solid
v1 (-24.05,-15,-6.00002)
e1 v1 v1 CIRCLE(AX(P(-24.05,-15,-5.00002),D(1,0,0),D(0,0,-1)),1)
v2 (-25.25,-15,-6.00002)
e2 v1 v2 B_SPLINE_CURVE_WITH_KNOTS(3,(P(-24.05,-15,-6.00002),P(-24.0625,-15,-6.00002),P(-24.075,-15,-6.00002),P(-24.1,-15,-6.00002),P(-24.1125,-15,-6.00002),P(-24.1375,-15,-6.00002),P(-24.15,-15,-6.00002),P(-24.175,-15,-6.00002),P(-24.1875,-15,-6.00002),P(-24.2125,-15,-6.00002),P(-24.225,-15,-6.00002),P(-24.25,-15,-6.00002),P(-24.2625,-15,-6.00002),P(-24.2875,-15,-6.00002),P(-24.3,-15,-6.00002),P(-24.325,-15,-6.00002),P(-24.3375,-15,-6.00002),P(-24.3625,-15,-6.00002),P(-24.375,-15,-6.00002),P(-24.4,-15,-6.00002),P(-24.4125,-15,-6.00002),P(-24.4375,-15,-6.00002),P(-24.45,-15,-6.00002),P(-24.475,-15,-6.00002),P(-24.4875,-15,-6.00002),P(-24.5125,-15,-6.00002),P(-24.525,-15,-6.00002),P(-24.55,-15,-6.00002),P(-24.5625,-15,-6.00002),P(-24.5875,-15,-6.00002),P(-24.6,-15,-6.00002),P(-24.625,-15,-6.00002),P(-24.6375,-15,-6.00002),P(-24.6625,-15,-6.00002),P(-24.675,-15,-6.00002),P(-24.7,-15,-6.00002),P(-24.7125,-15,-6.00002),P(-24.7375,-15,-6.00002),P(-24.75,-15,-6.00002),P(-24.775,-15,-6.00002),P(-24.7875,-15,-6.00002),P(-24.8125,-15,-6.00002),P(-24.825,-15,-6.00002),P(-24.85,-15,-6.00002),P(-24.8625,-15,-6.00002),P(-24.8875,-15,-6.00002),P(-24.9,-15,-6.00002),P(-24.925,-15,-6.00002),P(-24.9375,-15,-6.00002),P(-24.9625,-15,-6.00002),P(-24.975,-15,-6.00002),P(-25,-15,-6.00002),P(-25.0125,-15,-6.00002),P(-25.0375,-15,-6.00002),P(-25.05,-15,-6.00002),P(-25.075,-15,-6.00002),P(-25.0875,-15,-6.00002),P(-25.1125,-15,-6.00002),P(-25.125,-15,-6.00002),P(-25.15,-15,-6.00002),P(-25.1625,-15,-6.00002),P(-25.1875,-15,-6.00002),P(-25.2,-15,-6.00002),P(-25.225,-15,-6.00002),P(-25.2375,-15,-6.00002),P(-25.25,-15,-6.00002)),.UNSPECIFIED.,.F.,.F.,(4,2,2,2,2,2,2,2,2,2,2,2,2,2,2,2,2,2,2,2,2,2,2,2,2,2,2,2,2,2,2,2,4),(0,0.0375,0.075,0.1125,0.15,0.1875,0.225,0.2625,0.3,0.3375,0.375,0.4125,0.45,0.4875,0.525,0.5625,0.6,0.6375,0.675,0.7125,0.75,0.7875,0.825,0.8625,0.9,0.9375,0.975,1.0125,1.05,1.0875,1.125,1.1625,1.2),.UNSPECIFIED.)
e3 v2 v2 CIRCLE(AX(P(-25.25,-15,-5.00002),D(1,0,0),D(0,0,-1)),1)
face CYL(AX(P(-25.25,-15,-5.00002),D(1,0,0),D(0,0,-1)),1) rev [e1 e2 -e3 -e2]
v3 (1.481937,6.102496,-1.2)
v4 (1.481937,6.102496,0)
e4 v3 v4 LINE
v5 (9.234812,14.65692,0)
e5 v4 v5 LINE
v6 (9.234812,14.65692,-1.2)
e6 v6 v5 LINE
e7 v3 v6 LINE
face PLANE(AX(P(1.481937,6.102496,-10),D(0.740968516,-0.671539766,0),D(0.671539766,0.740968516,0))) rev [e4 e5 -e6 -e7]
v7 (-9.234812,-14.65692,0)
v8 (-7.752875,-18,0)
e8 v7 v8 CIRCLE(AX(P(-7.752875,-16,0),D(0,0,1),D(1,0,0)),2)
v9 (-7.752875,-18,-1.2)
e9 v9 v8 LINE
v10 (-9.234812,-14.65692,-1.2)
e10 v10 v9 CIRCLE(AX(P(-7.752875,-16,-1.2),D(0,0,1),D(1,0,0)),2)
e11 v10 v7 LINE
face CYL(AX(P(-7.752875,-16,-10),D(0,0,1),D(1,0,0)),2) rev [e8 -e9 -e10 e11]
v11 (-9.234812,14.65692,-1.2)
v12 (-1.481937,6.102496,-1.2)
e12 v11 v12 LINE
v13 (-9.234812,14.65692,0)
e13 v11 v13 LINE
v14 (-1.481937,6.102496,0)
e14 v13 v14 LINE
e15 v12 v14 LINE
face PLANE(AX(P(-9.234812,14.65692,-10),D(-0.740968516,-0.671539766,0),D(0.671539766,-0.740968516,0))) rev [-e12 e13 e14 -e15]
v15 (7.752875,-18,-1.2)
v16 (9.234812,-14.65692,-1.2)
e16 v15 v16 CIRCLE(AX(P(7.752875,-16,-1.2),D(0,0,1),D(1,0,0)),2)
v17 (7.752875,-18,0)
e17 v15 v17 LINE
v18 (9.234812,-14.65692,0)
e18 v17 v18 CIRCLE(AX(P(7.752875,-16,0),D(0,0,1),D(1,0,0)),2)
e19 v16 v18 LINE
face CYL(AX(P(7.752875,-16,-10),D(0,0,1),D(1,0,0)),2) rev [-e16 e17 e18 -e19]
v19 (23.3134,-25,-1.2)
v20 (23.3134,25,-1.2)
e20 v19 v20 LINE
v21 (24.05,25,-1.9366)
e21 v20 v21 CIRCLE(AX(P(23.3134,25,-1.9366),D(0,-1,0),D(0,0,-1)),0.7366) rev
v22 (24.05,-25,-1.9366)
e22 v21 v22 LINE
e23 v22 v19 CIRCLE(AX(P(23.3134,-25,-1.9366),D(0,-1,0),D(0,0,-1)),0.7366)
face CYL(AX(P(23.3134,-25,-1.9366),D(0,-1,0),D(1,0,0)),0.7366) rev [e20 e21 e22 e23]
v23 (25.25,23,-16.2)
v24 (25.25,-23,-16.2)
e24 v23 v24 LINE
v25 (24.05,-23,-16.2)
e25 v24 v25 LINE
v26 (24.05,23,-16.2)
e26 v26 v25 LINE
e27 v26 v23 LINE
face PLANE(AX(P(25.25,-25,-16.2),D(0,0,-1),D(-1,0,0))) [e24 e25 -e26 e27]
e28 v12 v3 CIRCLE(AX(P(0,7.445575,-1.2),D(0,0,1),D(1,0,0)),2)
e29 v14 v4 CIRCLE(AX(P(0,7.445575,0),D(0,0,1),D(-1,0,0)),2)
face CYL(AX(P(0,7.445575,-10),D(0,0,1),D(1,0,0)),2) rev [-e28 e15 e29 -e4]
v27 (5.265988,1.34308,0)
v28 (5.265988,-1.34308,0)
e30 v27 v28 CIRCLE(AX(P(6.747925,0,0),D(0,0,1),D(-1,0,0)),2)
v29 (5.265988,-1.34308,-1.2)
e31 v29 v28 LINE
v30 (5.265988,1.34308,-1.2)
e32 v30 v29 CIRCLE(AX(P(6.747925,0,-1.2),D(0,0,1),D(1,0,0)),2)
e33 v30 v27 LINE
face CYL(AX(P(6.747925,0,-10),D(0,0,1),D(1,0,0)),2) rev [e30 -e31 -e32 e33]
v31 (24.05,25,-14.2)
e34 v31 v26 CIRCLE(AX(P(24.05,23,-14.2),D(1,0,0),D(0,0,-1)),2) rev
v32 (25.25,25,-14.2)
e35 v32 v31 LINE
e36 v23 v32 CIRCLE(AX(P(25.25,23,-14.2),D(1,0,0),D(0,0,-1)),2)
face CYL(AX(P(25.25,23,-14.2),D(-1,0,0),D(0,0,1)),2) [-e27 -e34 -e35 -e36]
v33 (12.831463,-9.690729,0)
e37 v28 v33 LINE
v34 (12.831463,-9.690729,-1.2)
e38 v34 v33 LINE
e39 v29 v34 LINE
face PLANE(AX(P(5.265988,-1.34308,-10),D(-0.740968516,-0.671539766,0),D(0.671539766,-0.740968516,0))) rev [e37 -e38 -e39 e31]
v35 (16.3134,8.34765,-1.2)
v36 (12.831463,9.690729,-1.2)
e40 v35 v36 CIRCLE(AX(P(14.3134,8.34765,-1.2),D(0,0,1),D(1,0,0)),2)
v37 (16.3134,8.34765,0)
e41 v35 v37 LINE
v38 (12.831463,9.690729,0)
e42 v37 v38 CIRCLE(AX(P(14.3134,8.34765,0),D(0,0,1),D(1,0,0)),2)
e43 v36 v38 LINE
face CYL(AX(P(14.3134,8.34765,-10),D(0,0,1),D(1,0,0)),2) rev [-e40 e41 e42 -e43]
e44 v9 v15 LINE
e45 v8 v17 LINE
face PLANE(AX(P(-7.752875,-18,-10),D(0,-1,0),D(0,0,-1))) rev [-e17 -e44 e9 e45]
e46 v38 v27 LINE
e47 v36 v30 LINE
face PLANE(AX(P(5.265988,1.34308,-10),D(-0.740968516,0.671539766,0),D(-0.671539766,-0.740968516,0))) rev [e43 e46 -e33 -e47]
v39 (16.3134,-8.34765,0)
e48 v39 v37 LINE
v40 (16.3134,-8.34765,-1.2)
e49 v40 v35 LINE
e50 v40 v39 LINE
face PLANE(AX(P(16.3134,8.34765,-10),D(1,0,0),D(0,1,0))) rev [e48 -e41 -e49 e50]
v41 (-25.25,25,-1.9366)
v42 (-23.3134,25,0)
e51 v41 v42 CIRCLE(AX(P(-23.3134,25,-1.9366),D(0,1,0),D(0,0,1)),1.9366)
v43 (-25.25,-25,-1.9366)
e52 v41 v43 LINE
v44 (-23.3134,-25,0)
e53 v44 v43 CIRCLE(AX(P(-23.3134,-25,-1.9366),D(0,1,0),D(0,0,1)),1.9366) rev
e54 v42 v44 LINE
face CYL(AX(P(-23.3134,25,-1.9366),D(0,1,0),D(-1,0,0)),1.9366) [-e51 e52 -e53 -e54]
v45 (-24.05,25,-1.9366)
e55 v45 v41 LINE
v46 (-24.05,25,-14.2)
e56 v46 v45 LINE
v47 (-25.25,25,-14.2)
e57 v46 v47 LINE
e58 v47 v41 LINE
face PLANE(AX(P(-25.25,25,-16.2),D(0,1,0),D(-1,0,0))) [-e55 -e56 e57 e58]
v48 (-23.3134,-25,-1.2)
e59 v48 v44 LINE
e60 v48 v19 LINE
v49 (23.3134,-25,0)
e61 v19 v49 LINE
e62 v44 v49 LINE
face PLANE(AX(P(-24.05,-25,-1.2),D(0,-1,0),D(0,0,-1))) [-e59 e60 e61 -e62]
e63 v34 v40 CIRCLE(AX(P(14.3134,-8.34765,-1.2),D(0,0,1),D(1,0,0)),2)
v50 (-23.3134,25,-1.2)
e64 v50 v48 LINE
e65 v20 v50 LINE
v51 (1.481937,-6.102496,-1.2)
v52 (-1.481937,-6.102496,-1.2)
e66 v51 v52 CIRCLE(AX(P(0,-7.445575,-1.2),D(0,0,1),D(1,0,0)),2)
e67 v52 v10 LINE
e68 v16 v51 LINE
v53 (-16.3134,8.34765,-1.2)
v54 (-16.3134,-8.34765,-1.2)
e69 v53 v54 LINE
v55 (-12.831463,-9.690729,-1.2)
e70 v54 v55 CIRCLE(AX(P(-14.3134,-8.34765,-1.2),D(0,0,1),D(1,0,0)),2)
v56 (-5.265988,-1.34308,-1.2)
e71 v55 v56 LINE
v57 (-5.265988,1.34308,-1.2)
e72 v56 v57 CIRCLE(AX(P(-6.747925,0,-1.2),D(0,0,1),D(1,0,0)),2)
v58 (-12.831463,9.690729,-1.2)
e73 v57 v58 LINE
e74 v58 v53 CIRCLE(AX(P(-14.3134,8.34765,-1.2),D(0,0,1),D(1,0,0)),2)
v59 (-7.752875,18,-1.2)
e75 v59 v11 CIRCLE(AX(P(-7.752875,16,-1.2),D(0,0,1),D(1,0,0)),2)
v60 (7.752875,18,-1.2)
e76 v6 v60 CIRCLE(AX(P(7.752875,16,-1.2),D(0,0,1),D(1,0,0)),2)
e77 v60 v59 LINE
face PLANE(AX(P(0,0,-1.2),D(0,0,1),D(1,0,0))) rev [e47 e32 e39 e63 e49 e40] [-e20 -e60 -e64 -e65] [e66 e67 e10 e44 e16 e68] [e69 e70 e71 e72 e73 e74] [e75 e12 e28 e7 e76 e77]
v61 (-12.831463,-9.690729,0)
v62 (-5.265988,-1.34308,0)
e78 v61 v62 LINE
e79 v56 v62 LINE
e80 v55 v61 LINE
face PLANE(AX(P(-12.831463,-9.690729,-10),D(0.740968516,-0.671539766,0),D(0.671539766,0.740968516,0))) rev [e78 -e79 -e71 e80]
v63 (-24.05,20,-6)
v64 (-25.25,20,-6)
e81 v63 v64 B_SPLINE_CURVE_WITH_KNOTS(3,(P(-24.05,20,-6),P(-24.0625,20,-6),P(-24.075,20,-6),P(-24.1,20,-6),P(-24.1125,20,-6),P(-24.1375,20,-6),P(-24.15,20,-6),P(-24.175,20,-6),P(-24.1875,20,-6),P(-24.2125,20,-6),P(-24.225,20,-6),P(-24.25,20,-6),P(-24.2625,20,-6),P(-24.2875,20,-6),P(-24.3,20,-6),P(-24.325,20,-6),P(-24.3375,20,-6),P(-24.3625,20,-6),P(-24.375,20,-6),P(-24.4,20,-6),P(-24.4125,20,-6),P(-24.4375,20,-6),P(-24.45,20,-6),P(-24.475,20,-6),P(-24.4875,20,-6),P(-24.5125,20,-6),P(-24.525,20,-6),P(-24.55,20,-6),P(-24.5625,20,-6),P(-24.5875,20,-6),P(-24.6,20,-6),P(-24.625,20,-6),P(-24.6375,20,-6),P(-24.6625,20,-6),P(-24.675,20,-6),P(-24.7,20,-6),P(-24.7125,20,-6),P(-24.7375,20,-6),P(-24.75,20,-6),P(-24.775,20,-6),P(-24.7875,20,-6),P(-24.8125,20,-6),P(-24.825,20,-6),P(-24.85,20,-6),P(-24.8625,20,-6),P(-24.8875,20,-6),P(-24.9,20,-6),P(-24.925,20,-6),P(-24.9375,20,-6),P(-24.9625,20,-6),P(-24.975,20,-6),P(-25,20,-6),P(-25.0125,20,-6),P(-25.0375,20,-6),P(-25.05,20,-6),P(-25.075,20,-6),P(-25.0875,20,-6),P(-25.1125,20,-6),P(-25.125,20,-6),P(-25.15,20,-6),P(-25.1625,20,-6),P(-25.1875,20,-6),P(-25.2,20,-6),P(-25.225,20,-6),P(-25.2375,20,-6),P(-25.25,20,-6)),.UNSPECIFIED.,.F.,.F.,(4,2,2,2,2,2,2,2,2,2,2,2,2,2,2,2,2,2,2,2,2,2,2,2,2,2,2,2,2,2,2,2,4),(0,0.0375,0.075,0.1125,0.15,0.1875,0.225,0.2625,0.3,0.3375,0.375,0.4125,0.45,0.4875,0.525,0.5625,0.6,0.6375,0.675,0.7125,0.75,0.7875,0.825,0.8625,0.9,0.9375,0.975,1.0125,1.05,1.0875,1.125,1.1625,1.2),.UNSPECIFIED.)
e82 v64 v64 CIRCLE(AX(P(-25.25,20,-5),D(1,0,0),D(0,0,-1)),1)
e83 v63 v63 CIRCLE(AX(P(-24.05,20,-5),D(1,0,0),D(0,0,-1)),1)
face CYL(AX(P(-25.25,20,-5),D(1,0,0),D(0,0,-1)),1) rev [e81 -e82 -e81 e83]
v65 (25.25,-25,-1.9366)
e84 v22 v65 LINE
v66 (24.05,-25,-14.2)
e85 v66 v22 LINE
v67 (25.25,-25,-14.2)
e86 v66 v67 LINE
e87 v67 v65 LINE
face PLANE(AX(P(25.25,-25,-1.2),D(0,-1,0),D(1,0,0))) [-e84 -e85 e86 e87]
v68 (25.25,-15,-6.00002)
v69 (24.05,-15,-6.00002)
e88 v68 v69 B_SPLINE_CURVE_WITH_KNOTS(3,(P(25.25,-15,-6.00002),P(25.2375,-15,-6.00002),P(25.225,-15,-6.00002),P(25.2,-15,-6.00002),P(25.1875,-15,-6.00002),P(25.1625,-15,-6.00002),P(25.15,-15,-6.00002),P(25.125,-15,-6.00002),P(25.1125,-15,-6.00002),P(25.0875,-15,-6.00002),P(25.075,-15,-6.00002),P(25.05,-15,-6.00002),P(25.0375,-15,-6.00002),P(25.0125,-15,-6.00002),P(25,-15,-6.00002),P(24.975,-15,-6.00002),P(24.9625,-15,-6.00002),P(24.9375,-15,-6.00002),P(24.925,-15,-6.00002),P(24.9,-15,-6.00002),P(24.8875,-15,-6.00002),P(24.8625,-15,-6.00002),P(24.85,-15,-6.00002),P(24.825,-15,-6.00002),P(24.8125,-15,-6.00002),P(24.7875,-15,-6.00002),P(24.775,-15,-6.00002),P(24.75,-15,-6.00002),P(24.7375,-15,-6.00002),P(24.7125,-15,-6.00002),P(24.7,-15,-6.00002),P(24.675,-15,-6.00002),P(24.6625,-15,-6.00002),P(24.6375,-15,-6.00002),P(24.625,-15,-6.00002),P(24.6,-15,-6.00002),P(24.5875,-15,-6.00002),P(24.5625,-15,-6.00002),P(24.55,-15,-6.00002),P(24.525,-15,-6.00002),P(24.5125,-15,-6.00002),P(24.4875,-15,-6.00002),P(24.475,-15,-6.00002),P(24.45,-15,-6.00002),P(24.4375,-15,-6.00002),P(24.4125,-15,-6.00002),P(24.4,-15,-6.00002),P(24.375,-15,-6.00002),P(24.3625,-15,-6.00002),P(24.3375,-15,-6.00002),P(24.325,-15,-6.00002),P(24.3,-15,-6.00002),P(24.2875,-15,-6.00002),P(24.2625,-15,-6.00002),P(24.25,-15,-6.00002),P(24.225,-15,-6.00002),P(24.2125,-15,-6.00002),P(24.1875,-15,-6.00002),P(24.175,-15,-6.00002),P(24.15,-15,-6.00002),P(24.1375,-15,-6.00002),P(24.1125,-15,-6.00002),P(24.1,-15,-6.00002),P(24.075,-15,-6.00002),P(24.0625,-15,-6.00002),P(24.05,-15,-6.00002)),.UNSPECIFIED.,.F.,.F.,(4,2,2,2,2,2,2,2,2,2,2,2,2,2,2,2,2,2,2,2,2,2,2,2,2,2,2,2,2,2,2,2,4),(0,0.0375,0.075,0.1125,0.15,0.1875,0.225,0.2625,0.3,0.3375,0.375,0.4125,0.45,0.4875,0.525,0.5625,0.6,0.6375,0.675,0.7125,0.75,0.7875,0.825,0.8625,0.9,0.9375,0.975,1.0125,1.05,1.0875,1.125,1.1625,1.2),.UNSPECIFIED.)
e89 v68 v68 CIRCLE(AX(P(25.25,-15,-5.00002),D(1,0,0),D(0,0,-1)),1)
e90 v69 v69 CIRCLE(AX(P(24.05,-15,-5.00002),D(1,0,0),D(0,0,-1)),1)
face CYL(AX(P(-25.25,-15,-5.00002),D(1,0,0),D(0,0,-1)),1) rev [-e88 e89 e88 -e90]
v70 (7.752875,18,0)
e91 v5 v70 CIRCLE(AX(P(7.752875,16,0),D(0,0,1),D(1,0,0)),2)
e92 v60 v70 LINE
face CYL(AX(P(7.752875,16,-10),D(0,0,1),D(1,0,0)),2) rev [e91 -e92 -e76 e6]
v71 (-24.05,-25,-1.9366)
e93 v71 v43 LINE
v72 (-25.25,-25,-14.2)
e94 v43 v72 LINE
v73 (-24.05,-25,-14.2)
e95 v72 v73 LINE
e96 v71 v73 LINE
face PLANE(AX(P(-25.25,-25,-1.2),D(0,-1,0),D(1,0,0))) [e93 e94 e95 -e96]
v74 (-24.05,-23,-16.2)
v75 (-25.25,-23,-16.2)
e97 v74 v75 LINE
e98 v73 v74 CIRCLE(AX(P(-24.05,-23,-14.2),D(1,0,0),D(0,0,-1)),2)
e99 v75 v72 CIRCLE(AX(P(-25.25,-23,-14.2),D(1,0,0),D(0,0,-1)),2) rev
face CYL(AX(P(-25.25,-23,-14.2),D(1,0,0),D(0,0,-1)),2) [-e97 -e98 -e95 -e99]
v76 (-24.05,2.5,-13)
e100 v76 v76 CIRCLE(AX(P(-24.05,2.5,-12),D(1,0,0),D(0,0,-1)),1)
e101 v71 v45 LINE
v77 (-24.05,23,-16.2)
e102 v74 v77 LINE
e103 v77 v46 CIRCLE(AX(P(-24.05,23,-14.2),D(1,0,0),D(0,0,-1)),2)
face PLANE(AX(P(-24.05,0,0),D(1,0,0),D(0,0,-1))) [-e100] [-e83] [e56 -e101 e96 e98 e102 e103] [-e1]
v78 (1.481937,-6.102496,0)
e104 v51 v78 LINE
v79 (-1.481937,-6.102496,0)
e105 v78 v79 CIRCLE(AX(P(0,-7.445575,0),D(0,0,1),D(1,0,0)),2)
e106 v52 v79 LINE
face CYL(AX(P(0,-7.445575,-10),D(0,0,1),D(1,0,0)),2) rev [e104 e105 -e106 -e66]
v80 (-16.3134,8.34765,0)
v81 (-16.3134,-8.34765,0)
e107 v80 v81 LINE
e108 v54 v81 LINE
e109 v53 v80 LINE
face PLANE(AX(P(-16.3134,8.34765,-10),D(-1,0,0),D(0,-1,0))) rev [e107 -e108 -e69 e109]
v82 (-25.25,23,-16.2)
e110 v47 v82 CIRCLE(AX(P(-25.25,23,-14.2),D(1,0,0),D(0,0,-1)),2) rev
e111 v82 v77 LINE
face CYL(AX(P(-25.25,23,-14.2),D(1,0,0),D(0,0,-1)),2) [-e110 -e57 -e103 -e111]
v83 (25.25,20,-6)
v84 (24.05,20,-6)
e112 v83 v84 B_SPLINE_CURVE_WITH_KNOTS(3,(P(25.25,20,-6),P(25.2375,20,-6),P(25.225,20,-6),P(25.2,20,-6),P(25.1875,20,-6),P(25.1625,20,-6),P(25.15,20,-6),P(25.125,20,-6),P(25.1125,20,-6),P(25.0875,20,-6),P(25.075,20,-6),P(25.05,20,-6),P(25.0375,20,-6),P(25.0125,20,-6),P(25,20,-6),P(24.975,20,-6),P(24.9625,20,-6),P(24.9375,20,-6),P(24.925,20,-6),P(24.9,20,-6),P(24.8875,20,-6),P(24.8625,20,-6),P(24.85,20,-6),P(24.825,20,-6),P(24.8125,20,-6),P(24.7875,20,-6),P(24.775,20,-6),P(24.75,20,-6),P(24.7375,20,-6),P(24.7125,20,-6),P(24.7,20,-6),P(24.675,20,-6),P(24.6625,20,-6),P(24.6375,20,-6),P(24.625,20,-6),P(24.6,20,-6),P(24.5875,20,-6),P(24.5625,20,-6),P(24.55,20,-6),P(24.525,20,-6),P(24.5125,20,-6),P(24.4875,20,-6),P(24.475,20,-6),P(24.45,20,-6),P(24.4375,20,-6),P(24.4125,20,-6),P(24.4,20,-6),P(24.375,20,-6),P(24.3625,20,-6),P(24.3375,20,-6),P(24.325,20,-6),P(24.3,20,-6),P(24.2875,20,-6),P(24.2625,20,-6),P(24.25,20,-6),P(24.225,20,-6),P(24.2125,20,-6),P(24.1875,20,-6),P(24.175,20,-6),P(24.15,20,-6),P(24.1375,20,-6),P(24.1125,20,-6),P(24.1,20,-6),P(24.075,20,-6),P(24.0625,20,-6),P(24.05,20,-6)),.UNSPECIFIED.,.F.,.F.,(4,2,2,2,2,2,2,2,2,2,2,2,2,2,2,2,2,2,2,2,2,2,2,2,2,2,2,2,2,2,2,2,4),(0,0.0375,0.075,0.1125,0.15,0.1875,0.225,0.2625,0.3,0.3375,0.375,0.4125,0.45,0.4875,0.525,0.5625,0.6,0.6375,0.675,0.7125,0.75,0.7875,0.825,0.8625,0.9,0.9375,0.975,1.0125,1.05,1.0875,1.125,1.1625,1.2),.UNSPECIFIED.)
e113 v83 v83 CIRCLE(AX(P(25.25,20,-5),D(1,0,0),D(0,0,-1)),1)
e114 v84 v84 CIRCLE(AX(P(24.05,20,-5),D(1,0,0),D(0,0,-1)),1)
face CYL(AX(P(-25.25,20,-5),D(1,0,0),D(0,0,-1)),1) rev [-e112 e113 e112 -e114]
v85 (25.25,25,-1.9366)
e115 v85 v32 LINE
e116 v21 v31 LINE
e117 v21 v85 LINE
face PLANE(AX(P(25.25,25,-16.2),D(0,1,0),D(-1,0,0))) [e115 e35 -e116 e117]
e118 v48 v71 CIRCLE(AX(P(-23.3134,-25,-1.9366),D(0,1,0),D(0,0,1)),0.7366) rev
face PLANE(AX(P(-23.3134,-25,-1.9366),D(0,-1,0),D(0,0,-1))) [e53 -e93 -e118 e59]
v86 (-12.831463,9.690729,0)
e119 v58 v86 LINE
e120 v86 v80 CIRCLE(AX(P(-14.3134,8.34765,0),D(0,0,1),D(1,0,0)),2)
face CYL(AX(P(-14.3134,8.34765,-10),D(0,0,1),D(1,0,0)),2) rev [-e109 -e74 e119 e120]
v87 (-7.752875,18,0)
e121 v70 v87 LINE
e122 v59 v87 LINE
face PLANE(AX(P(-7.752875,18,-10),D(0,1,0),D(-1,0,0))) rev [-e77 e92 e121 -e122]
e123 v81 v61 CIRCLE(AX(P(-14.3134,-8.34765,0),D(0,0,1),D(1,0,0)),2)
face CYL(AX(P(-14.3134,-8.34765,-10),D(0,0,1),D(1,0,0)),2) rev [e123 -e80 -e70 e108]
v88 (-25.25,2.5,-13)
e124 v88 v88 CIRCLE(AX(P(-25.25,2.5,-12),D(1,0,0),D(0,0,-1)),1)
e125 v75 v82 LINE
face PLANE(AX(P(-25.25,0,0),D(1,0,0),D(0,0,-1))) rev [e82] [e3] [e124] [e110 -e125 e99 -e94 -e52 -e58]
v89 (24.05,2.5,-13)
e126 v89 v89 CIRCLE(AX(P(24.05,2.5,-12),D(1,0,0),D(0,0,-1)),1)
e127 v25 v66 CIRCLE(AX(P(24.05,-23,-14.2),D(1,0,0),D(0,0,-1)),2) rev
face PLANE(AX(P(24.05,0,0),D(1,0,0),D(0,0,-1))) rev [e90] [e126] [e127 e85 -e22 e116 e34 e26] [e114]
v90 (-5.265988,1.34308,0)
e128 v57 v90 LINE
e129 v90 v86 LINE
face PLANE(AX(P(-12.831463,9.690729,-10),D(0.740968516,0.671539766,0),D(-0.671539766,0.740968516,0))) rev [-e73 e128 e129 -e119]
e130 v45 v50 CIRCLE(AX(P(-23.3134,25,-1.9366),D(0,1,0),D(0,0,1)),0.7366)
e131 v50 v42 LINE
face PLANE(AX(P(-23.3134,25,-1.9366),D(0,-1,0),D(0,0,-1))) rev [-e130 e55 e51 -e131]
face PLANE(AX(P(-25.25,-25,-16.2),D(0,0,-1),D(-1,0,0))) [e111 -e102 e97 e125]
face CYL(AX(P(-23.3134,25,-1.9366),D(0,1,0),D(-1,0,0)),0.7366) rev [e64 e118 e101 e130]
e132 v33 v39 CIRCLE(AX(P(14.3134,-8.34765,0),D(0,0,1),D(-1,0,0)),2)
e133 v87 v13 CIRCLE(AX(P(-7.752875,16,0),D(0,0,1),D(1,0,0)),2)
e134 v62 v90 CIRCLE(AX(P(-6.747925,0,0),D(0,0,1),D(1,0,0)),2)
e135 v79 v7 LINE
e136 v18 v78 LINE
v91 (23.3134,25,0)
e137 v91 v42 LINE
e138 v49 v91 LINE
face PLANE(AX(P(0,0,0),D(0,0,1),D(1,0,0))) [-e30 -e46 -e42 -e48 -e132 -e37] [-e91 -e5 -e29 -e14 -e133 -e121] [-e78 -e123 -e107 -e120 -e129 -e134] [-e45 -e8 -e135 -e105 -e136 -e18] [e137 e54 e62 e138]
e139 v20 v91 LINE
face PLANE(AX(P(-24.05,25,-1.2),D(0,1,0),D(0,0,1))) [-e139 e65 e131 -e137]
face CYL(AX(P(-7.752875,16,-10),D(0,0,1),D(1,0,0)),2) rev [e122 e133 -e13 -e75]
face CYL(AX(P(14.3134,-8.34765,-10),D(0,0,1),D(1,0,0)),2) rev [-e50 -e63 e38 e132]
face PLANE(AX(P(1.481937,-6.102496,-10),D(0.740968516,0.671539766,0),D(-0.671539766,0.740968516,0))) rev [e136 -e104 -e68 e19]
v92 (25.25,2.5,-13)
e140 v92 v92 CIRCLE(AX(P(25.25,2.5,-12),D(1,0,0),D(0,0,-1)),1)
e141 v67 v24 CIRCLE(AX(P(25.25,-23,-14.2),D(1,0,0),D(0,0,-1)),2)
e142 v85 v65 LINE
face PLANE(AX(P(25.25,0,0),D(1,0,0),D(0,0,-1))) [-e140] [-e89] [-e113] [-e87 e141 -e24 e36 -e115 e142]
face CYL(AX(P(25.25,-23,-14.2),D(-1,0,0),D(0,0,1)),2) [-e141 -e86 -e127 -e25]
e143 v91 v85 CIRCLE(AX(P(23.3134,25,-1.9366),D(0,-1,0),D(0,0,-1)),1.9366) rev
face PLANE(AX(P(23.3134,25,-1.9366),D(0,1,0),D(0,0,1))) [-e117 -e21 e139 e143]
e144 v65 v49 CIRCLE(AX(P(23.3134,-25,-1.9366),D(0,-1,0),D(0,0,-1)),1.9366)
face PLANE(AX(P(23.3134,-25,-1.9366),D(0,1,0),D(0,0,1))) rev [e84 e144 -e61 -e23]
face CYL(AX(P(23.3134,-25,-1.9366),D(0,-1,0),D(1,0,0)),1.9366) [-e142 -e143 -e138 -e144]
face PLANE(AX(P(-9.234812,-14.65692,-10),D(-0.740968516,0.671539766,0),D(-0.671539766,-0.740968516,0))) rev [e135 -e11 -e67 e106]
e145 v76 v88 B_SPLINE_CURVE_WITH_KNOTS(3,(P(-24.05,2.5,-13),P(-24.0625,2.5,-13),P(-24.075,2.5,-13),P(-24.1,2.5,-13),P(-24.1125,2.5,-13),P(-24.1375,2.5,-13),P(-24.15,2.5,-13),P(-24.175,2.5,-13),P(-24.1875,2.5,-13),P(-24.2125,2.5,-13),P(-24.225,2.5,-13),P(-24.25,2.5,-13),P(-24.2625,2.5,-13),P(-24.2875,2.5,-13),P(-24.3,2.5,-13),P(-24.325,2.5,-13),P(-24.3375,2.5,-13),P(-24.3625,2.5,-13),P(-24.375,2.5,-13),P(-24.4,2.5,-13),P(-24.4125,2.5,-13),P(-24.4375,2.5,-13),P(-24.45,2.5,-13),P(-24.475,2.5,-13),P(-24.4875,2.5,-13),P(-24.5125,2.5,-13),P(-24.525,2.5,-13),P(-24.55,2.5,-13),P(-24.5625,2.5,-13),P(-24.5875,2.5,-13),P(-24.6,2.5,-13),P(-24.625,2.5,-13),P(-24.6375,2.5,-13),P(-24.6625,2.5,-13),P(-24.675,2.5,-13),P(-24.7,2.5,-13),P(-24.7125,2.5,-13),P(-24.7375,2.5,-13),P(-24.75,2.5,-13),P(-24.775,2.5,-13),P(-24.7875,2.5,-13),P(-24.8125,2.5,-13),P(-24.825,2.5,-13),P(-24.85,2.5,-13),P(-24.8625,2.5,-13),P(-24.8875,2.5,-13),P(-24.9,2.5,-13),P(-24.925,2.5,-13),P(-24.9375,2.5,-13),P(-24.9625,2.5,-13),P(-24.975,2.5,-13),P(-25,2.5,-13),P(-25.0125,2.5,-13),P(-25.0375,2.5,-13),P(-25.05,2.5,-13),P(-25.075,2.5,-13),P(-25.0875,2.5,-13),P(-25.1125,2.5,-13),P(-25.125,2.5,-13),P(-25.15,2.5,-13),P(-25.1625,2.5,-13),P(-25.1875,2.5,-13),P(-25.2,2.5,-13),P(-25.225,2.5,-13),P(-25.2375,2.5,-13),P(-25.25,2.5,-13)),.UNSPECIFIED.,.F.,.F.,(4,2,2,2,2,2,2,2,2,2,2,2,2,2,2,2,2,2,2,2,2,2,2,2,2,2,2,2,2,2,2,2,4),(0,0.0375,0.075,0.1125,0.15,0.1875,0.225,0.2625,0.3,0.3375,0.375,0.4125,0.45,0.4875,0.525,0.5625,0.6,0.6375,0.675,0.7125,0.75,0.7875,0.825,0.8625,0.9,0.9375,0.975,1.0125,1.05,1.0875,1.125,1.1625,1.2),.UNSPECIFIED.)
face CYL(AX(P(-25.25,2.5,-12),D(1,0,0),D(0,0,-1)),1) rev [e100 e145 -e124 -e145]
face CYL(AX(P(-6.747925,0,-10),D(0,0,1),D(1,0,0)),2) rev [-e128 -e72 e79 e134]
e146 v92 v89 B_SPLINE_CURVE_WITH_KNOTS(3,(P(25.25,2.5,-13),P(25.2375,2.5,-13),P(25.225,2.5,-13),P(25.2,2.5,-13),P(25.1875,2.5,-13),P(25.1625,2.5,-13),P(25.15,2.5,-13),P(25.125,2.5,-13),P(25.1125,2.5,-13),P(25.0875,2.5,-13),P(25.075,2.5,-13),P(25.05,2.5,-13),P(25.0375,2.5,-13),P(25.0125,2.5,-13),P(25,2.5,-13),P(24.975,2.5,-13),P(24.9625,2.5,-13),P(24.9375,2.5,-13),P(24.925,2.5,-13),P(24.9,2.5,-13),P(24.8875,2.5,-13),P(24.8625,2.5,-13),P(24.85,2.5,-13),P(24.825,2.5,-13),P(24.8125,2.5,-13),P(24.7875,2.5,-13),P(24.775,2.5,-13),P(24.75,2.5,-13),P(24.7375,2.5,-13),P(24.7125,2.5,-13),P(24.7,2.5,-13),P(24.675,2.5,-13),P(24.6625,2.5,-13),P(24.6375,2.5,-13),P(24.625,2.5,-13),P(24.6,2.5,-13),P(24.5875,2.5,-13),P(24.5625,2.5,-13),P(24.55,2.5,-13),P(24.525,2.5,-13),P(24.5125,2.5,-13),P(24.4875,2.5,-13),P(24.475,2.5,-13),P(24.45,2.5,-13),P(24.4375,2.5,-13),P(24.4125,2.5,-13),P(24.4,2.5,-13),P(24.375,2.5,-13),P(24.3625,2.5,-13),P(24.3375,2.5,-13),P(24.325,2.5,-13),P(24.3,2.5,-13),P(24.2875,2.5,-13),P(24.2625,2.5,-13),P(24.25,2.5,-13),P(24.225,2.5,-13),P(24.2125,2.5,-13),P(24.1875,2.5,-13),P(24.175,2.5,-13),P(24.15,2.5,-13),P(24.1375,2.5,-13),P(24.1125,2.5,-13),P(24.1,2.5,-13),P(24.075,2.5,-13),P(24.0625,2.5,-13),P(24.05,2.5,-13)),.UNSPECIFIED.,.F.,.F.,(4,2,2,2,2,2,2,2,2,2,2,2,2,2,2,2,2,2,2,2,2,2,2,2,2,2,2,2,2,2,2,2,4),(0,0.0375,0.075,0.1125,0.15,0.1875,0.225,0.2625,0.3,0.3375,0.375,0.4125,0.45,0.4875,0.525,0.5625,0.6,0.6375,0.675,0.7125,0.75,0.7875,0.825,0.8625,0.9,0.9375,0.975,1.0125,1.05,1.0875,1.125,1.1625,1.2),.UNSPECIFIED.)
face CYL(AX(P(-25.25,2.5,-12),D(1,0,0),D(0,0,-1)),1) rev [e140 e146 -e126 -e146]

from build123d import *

# Parameters (mm, degrees)
SKETCH_1_W                         = 48.1
SKETCH_1_H                         = 50
SM_BASE_FLANGE_1_DEPTH             = 1.2
SM_EDGE_FLANGE_1_STRIP_W           = 6.2732
SM_EDGE_FLANGE_1_STRIP_H           = 1.2
SM_EDGE_FLANGE_1_STRIP_CUT_DEPTH   = 50
SM_EDGE_FLANGE_1_STRIP_2_W         = 6.2732
SM_EDGE_FLANGE_1_STRIP_2_H         = 1.2
SM_EDGE_FLANGE_1_STRIP_CUT_2_DEPTH = 50
SM_EDGE_FLANGE_1_DEPTH             = 50
SM_EDGE_FLANGE_1_BEND_DEPTH        = 50
CUT_EXTRUDE_1_DEPTH                = 10
SKETCH_17_R                        = 1
CUT_EXTRUDE_2_DEPTH                = 59.631817301
FILLET_1_R                         = 2


# Sheet-metal steps are written as plain solids
with BuildPart() as part:
    # Sketch 1 → 基材-凸緣1 (new body)
    with BuildSketch(Plane.XY):
        Rectangle(SKETCH_1_W, SKETCH_1_H)
    extrude(amount=-SM_BASE_FLANGE_1_DEPTH)

    # 邊線-凸緣1 strip (across the edge) → 邊線-凸緣1 strip cut (cut)
    with BuildSketch(Plane(origin=(24.05, 25, -1.2), x_dir=(-1, 0, 0), z_dir=(0, -1, 0))):
        with Locations((-2.4, -0.6)):
            Rectangle(SM_EDGE_FLANGE_1_STRIP_W, SM_EDGE_FLANGE_1_STRIP_H)
    extrude(amount=SM_EDGE_FLANGE_1_STRIP_CUT_DEPTH, mode=Mode.SUBTRACT)

    # 邊線-凸緣1 strip 2 (across the edge) → 邊線-凸緣1 strip cut 2 (cut)
    with BuildSketch(Plane(origin=(-24.05, -25, -1.2), x_dir=(1, 0, 0), z_dir=(0, 1, 0))):
        with Locations((-2.4, -0.6)):
            Rectangle(SM_EDGE_FLANGE_1_STRIP_2_W, SM_EDGE_FLANGE_1_STRIP_2_H)
    extrude(amount=SM_EDGE_FLANGE_1_STRIP_CUT_2_DEPTH, mode=Mode.SUBTRACT)

    # 邊線-凸緣1 section (across the edge) → 邊線-凸緣1 (add)
    with BuildSketch(Plane(origin=(24.05, 25, -1.2), x_dir=(-1, 0, 0), z_dir=(0, -1, 0))):
        with BuildLine():
            Line((-1.2, 0.7366), (-1.2, 15))
            Line((-1.2, 15), (0, 15))
            Line((0, 15), (0, 0.7366))
            ThreePointArc((0, 0.7366), (0.215745145, 0.215745145), (0.7366, 0))
            Line((0.7366, 0), (0.7366, -1.2))
            ThreePointArc((0.7366, -1.2), (-0.632782992, -0.632782992), (-1.2, 0.7366))
        make_face()
    extrude(amount=SM_EDGE_FLANGE_1_DEPTH)

    # 邊線-凸緣1 section 2 (across the edge) → 邊線-凸緣1 bend (add)
    with BuildSketch(Plane(origin=(-24.05, -25, -1.2), x_dir=(1, 0, 0), z_dir=(0, 1, 0))):
        with BuildLine():
            Line((-1.2, 0.7366), (-1.2, 15))
            Line((-1.2, 15), (0, 15))
            Line((0, 15), (0, 0.7366))
            ThreePointArc((0, 0.7366), (0.215745145, 0.215745145), (0.7366, 0))
            Line((0.7366, 0), (0.7366, -1.2))
            ThreePointArc((0.7366, -1.2), (-0.632782992, -0.632782992), (-1.2, 0.7366))
        make_face()
    extrude(amount=SM_EDGE_FLANGE_1_BEND_DEPTH)

    # 草圖14 → 除料-伸長1 (cut)
    with BuildSketch(Plane.XY):
        with BuildLine():
            Line((-7.752874967, 18), (7.752874967, 18))
            ThreePointArc((7.752874967, 18), (9.581283984, 16.810506303), (9.234812, 14.656920467))
            Line((9.234812, 14.656920467), (1.481937033, 6.10249592))
            ThreePointArc((1.481937033, 6.10249592), (0, 5.445575453), (-1.481937033, 6.10249592))
            Line((-1.481937033, 6.10249592), (-9.234812, 14.656920467))
            ThreePointArc((-9.234812, 14.656920467), (-9.581283984, 16.810506303), (-7.752874967, 18))
        make_face()
        with BuildLine():
            Line((-16.3134, 8.347649749), (-16.3134, -8.347649749))
            ThreePointArc((-16.3134, -8.347649749), (-15.033165911, -10.213644666), (-12.831462967, -9.690729281))
            Line((-12.831462967, -9.690729281), (-5.265988, -1.343079533))
            ThreePointArc((-5.265988, -1.343079533), (-4.747925033, 0), (-5.265988, 1.343079533))
            Line((-5.265988, 1.343079533), (-12.831462967, 9.690729281))
            ThreePointArc((-12.831462967, 9.690729281), (-15.033165911, 10.213644666), (-16.3134, 8.347649749))
        make_face()
        with BuildLine():
            Line((-7.752874967, -18), (7.752874967, -18))
            ThreePointArc((7.752874967, -18), (9.581283984, -16.810506303), (9.234812, -14.656920467))
            Line((9.234812, -14.656920467), (1.481937033, -6.10249592))
            ThreePointArc((1.481937033, -6.10249592), (0, -5.445575453), (-1.481937033, -6.10249592))
            Line((-1.481937033, -6.10249592), (-9.234812, -14.656920467))
            ThreePointArc((-9.234812, -14.656920467), (-9.581283984, -16.810506303), (-7.752874967, -18))
        make_face()
        with BuildLine():
            Line((16.3134, 8.347649749), (16.3134, -8.347649749))
            ThreePointArc((16.3134, -8.347649749), (15.033165911, -10.213644666), (12.831462967, -9.690729281))
            Line((12.831462967, -9.690729281), (5.265988, -1.343079533))
            ThreePointArc((5.265988, -1.343079533), (4.747925033, 0), (5.265988, 1.343079533))
            Line((5.265988, 1.343079533), (12.831462967, 9.690729281))
            ThreePointArc((12.831462967, 9.690729281), (15.033165911, 10.213644666), (16.3134, 8.347649749))
        make_face()
    extrude(amount=-CUT_EXTRUDE_1_DEPTH, mode=Mode.SUBTRACT)

    # 草圖17 → 除料-伸長2 (cut, through all)
    with BuildSketch(Plane(origin=(25.25, 0, 0), x_dir=(0, 0, -1), z_dir=(1, 0, 0))):
        with Locations((5, 20)):
            Circle(SKETCH_17_R)
        with Locations((5.000020411, -15)):
            Circle(SKETCH_17_R)
        with Locations((12, 2.5)):
            Circle(SKETCH_17_R)
    extrude(amount=-CUT_EXTRUDE_2_DEPTH, mode=Mode.SUBTRACT)

    # 圓角1
    fillet_1_edges = [part.edges().sort_by_distance(p)[0] for p in [
        (24.65, 25, -16.2),
        (24.65, -25, -16.2),
        (-24.65, -25, -16.2),
        (-24.65, 25, -16.2),
    ]]
    fillet(fillet_1_edges, radius=FILLET_1_R)


solid = part.part
